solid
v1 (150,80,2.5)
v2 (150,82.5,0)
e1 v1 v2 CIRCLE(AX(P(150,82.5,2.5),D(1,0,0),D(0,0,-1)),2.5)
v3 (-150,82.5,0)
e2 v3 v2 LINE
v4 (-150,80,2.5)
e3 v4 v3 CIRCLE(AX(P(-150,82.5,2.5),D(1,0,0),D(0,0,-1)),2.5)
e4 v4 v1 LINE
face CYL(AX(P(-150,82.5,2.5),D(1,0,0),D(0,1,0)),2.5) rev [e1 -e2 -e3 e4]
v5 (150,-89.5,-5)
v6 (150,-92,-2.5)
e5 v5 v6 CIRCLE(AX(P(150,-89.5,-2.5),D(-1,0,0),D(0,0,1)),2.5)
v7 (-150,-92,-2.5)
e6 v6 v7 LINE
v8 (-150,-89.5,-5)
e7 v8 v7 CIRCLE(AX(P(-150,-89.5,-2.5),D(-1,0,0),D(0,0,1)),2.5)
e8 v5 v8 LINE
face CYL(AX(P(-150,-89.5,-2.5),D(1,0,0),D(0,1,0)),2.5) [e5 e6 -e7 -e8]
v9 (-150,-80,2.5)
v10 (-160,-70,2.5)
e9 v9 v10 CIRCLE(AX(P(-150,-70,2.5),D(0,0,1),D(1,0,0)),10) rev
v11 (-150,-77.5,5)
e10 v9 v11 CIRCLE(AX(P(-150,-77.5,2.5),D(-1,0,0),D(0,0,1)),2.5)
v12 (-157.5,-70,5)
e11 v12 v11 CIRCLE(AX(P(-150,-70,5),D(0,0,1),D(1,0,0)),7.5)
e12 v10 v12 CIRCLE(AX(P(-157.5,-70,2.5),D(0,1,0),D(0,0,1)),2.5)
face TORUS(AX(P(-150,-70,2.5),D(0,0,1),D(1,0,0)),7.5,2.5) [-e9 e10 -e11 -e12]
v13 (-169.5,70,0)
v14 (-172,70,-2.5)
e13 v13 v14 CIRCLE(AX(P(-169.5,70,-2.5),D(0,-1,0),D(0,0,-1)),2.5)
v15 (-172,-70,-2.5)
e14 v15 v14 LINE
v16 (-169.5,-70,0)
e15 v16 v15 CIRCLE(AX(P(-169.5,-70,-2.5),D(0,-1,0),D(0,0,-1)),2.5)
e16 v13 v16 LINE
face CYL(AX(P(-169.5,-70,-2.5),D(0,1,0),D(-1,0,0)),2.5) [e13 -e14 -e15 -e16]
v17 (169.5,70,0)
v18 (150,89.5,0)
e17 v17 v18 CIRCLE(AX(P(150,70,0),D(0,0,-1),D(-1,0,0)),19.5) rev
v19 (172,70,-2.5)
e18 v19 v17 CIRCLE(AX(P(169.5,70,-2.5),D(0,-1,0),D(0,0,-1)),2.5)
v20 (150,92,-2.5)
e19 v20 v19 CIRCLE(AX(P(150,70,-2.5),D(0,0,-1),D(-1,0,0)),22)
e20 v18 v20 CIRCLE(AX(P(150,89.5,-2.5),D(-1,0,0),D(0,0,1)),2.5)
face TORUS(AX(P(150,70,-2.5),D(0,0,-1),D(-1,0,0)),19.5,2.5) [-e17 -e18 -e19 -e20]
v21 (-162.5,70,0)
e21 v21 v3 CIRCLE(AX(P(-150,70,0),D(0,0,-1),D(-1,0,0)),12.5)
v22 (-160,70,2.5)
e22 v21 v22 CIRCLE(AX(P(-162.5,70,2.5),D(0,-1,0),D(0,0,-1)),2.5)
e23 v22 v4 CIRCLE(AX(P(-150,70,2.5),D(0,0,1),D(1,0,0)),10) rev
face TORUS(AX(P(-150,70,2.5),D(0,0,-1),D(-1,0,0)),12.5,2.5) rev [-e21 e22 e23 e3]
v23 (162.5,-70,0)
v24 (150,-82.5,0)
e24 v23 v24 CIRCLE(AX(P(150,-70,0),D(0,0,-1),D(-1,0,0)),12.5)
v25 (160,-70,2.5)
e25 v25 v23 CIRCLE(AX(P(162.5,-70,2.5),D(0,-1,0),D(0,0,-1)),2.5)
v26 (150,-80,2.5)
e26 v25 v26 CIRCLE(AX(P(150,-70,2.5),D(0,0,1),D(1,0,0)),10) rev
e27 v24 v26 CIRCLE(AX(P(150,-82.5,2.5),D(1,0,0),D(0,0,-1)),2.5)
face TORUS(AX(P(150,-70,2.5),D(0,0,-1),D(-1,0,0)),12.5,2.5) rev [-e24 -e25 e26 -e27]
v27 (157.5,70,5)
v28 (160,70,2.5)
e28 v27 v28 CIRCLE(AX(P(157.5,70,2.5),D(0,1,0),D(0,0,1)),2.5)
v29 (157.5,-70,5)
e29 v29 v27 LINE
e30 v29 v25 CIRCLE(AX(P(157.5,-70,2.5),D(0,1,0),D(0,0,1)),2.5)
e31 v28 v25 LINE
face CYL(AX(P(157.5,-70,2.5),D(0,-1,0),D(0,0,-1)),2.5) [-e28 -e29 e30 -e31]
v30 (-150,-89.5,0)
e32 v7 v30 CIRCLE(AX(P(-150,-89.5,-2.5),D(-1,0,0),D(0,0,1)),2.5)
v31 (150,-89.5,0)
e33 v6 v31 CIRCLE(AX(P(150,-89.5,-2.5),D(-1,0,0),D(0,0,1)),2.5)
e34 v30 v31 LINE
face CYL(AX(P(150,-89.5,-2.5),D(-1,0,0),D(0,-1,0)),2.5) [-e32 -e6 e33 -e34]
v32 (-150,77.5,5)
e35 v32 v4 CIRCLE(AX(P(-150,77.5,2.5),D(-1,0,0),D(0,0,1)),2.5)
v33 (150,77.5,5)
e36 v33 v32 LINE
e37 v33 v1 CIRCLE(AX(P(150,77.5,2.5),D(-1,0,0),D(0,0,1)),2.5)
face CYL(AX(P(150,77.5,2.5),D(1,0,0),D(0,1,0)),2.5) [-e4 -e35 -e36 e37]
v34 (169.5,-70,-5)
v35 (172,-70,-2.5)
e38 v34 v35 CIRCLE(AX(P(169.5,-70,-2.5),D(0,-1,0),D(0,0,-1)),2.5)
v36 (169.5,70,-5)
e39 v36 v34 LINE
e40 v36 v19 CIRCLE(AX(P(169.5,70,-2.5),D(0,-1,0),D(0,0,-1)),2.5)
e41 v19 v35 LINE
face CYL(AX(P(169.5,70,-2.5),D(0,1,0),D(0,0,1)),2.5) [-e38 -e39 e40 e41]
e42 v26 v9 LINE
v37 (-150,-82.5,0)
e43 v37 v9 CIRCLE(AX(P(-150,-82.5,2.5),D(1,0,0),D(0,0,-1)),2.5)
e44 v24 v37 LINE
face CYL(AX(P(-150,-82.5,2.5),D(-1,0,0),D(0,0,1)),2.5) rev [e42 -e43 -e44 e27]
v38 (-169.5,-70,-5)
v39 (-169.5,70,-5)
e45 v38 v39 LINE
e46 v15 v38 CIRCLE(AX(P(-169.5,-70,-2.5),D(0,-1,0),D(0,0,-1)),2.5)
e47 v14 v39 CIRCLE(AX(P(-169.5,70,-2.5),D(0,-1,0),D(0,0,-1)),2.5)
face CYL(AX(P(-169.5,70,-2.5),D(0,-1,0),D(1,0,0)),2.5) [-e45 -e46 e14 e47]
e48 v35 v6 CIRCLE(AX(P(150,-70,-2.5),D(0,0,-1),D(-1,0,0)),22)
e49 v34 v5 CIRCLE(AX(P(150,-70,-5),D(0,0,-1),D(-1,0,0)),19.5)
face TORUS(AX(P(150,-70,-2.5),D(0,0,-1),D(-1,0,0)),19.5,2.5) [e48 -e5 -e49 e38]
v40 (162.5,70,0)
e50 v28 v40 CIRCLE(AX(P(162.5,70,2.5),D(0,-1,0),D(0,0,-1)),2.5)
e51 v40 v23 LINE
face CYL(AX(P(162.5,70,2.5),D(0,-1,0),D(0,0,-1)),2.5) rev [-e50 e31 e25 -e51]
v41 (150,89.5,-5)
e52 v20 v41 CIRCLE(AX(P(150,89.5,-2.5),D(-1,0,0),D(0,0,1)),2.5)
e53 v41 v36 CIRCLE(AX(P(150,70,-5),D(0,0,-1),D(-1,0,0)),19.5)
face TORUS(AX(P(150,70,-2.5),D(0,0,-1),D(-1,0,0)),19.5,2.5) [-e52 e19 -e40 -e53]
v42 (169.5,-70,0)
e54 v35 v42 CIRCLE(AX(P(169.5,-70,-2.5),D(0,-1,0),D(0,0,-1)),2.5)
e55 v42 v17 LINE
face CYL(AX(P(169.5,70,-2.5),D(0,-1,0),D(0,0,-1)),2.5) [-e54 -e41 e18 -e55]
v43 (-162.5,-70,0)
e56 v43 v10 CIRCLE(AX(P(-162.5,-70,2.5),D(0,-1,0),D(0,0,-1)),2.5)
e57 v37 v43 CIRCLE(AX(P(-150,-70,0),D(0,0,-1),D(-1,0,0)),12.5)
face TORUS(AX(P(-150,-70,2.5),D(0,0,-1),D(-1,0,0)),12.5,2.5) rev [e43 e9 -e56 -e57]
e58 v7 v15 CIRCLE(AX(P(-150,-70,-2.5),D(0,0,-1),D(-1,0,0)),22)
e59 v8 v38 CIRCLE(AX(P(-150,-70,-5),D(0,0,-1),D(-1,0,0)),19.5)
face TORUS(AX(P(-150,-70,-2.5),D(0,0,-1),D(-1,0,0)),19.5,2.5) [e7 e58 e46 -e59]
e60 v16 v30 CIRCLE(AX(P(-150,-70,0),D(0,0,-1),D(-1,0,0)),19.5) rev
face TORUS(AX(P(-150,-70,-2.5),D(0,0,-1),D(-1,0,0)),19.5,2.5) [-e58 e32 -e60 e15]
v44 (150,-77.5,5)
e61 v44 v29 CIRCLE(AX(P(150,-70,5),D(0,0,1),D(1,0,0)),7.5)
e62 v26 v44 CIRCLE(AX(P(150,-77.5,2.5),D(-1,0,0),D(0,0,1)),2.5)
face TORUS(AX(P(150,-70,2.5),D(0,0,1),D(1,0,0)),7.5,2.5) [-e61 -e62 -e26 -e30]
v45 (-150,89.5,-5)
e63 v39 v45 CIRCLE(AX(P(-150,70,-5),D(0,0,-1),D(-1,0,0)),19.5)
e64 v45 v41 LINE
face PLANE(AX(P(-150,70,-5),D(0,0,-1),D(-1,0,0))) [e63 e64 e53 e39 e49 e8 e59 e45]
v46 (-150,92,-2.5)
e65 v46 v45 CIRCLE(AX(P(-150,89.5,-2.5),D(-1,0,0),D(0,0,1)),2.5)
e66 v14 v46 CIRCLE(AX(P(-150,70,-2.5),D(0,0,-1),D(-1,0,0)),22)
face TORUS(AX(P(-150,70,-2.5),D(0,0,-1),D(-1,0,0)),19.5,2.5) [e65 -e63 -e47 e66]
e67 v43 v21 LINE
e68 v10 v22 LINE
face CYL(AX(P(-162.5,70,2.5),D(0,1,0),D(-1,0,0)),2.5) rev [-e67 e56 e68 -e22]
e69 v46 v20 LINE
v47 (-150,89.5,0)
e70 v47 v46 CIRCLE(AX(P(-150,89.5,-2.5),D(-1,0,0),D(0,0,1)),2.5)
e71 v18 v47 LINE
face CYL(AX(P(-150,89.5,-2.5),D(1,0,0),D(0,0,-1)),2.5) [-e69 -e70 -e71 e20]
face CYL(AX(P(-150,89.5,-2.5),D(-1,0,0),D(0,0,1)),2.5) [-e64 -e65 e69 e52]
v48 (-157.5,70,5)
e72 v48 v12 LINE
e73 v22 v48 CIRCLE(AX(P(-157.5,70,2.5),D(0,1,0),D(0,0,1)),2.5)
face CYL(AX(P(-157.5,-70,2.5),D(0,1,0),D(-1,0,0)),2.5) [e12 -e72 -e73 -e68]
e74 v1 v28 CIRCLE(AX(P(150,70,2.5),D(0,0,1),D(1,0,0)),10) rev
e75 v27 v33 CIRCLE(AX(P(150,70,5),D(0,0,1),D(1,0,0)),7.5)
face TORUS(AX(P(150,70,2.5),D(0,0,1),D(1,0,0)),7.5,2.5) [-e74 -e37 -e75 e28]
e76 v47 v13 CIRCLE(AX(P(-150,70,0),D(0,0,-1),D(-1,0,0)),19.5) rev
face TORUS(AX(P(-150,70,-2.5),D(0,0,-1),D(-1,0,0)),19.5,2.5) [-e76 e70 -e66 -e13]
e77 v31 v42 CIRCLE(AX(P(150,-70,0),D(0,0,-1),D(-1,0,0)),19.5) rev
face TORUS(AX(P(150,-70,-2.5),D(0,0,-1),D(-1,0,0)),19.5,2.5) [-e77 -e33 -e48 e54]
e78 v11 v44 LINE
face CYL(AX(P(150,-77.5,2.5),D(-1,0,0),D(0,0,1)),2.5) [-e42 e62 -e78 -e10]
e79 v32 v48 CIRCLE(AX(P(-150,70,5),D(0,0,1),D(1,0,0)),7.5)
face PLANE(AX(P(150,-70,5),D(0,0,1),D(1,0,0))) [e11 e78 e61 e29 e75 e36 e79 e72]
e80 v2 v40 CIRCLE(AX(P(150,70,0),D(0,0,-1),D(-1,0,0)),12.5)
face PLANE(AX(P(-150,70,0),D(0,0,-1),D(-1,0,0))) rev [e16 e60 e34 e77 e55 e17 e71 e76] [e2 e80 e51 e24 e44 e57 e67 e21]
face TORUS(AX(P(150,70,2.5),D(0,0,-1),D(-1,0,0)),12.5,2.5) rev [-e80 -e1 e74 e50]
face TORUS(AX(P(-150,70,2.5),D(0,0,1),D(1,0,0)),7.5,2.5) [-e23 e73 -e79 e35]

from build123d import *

# Parameters (mm, degrees)
BOSS_EXTRUDE2_DEPTH = 5
BOSS_EXTRUDE3_DEPTH = 5
FILLET4_R           = 2.5


with BuildPart() as part:
    # Sketch3 → Boss-Extrude2 (new body)
    with BuildSketch(Plane.XY):
        with BuildLine():
            Line((-150, 80), (150, 80))
            ThreePointArc((150, 80), (157.071067812, 77.071067812), (160, 70))
            Line((160, 70), (160, -70))
            ThreePointArc((160, -70), (157.071067812, -77.071067812), (150, -80))
            Line((150, -80), (-150, -80))
            ThreePointArc((-150, -80), (-157.071067812, -77.071067812), (-160, -70))
            Line((-160, -70), (-160, 70))
            ThreePointArc((-160, 70), (-157.071067812, 77.071067812), (-150, 80))
        make_face()
    extrude(amount=BOSS_EXTRUDE2_DEPTH)

    # Sketch4 → Boss-Extrude3 (add)
    with BuildSketch(Plane(origin=(0, 0, 0), x_dir=(-1, 0, 0), z_dir=(0, 0, -1))):
        with BuildLine():
            Line((150, 92), (-150, 92))
            ThreePointArc((-150, 92), (-165.556349186, 85.556349186), (-172, 70))
            Line((-172, 70), (-172, -70))
            ThreePointArc((-172, -70), (-165.556349186, -85.556349186), (-150, -92))
            Line((-150, -92), (150, -92))
            ThreePointArc((150, -92), (165.556349186, -85.556349186), (172, -70))
            Line((172, -70), (172, 70))
            ThreePointArc((172, 70), (165.556349186, 85.556349186), (150, 92))
        make_face()
    extrude(amount=BOSS_EXTRUDE3_DEPTH)

    # Fillet4
    fillet4_edges = [part.edges().sort_by_distance(p)[0] for p in [
        (-157.071067812, 77.071067812, 5),
        (0, 80, 5),
        (157.071067812, 77.071067812, 5),
        (160, 0, 5),
        (157.071067812, -77.071067812, 5),
        (-160, 0, 5),
        (0, -80, 5),
        (-157.071067812, -77.071067812, 5),
        (-157.071067812, 77.071067812, 0),
        (0, 80, 0),
        (157.071067812, 77.071067812, 0),
        (160, 0, 0),
        (157.071067812, -77.071067812, 0),
        (0, -80, 0),
        (-157.071067812, -77.071067812, 0),
        (-160, 0, 0),
        (-165.556349186, -85.556349186, -5),
        (0, -92, -5),
        (165.556349186, -85.556349186, -5),
        (172, 0, -5),
        (165.556349186, 85.556349186, -5),
        (0, 92, -5),
        (-165.556349186, 85.556349186, -5),
        (-165.556349186, -85.556349186, 0),
        (0, -92, 0),
        (165.556349186, -85.556349186, 0),
        (172, 0, 0),
        (165.556349186, 85.556349186, 0),
        (0, 92, 0),
        (-165.556349186, 85.556349186, 0),
        (-172, 0, -5),
        (-172, 0, 0),
    ]]
    fillet(fillet4_edges, radius=FILLET4_R - 0.0001)  # a hair under: the kernel refuses the full size


solid = part.part
